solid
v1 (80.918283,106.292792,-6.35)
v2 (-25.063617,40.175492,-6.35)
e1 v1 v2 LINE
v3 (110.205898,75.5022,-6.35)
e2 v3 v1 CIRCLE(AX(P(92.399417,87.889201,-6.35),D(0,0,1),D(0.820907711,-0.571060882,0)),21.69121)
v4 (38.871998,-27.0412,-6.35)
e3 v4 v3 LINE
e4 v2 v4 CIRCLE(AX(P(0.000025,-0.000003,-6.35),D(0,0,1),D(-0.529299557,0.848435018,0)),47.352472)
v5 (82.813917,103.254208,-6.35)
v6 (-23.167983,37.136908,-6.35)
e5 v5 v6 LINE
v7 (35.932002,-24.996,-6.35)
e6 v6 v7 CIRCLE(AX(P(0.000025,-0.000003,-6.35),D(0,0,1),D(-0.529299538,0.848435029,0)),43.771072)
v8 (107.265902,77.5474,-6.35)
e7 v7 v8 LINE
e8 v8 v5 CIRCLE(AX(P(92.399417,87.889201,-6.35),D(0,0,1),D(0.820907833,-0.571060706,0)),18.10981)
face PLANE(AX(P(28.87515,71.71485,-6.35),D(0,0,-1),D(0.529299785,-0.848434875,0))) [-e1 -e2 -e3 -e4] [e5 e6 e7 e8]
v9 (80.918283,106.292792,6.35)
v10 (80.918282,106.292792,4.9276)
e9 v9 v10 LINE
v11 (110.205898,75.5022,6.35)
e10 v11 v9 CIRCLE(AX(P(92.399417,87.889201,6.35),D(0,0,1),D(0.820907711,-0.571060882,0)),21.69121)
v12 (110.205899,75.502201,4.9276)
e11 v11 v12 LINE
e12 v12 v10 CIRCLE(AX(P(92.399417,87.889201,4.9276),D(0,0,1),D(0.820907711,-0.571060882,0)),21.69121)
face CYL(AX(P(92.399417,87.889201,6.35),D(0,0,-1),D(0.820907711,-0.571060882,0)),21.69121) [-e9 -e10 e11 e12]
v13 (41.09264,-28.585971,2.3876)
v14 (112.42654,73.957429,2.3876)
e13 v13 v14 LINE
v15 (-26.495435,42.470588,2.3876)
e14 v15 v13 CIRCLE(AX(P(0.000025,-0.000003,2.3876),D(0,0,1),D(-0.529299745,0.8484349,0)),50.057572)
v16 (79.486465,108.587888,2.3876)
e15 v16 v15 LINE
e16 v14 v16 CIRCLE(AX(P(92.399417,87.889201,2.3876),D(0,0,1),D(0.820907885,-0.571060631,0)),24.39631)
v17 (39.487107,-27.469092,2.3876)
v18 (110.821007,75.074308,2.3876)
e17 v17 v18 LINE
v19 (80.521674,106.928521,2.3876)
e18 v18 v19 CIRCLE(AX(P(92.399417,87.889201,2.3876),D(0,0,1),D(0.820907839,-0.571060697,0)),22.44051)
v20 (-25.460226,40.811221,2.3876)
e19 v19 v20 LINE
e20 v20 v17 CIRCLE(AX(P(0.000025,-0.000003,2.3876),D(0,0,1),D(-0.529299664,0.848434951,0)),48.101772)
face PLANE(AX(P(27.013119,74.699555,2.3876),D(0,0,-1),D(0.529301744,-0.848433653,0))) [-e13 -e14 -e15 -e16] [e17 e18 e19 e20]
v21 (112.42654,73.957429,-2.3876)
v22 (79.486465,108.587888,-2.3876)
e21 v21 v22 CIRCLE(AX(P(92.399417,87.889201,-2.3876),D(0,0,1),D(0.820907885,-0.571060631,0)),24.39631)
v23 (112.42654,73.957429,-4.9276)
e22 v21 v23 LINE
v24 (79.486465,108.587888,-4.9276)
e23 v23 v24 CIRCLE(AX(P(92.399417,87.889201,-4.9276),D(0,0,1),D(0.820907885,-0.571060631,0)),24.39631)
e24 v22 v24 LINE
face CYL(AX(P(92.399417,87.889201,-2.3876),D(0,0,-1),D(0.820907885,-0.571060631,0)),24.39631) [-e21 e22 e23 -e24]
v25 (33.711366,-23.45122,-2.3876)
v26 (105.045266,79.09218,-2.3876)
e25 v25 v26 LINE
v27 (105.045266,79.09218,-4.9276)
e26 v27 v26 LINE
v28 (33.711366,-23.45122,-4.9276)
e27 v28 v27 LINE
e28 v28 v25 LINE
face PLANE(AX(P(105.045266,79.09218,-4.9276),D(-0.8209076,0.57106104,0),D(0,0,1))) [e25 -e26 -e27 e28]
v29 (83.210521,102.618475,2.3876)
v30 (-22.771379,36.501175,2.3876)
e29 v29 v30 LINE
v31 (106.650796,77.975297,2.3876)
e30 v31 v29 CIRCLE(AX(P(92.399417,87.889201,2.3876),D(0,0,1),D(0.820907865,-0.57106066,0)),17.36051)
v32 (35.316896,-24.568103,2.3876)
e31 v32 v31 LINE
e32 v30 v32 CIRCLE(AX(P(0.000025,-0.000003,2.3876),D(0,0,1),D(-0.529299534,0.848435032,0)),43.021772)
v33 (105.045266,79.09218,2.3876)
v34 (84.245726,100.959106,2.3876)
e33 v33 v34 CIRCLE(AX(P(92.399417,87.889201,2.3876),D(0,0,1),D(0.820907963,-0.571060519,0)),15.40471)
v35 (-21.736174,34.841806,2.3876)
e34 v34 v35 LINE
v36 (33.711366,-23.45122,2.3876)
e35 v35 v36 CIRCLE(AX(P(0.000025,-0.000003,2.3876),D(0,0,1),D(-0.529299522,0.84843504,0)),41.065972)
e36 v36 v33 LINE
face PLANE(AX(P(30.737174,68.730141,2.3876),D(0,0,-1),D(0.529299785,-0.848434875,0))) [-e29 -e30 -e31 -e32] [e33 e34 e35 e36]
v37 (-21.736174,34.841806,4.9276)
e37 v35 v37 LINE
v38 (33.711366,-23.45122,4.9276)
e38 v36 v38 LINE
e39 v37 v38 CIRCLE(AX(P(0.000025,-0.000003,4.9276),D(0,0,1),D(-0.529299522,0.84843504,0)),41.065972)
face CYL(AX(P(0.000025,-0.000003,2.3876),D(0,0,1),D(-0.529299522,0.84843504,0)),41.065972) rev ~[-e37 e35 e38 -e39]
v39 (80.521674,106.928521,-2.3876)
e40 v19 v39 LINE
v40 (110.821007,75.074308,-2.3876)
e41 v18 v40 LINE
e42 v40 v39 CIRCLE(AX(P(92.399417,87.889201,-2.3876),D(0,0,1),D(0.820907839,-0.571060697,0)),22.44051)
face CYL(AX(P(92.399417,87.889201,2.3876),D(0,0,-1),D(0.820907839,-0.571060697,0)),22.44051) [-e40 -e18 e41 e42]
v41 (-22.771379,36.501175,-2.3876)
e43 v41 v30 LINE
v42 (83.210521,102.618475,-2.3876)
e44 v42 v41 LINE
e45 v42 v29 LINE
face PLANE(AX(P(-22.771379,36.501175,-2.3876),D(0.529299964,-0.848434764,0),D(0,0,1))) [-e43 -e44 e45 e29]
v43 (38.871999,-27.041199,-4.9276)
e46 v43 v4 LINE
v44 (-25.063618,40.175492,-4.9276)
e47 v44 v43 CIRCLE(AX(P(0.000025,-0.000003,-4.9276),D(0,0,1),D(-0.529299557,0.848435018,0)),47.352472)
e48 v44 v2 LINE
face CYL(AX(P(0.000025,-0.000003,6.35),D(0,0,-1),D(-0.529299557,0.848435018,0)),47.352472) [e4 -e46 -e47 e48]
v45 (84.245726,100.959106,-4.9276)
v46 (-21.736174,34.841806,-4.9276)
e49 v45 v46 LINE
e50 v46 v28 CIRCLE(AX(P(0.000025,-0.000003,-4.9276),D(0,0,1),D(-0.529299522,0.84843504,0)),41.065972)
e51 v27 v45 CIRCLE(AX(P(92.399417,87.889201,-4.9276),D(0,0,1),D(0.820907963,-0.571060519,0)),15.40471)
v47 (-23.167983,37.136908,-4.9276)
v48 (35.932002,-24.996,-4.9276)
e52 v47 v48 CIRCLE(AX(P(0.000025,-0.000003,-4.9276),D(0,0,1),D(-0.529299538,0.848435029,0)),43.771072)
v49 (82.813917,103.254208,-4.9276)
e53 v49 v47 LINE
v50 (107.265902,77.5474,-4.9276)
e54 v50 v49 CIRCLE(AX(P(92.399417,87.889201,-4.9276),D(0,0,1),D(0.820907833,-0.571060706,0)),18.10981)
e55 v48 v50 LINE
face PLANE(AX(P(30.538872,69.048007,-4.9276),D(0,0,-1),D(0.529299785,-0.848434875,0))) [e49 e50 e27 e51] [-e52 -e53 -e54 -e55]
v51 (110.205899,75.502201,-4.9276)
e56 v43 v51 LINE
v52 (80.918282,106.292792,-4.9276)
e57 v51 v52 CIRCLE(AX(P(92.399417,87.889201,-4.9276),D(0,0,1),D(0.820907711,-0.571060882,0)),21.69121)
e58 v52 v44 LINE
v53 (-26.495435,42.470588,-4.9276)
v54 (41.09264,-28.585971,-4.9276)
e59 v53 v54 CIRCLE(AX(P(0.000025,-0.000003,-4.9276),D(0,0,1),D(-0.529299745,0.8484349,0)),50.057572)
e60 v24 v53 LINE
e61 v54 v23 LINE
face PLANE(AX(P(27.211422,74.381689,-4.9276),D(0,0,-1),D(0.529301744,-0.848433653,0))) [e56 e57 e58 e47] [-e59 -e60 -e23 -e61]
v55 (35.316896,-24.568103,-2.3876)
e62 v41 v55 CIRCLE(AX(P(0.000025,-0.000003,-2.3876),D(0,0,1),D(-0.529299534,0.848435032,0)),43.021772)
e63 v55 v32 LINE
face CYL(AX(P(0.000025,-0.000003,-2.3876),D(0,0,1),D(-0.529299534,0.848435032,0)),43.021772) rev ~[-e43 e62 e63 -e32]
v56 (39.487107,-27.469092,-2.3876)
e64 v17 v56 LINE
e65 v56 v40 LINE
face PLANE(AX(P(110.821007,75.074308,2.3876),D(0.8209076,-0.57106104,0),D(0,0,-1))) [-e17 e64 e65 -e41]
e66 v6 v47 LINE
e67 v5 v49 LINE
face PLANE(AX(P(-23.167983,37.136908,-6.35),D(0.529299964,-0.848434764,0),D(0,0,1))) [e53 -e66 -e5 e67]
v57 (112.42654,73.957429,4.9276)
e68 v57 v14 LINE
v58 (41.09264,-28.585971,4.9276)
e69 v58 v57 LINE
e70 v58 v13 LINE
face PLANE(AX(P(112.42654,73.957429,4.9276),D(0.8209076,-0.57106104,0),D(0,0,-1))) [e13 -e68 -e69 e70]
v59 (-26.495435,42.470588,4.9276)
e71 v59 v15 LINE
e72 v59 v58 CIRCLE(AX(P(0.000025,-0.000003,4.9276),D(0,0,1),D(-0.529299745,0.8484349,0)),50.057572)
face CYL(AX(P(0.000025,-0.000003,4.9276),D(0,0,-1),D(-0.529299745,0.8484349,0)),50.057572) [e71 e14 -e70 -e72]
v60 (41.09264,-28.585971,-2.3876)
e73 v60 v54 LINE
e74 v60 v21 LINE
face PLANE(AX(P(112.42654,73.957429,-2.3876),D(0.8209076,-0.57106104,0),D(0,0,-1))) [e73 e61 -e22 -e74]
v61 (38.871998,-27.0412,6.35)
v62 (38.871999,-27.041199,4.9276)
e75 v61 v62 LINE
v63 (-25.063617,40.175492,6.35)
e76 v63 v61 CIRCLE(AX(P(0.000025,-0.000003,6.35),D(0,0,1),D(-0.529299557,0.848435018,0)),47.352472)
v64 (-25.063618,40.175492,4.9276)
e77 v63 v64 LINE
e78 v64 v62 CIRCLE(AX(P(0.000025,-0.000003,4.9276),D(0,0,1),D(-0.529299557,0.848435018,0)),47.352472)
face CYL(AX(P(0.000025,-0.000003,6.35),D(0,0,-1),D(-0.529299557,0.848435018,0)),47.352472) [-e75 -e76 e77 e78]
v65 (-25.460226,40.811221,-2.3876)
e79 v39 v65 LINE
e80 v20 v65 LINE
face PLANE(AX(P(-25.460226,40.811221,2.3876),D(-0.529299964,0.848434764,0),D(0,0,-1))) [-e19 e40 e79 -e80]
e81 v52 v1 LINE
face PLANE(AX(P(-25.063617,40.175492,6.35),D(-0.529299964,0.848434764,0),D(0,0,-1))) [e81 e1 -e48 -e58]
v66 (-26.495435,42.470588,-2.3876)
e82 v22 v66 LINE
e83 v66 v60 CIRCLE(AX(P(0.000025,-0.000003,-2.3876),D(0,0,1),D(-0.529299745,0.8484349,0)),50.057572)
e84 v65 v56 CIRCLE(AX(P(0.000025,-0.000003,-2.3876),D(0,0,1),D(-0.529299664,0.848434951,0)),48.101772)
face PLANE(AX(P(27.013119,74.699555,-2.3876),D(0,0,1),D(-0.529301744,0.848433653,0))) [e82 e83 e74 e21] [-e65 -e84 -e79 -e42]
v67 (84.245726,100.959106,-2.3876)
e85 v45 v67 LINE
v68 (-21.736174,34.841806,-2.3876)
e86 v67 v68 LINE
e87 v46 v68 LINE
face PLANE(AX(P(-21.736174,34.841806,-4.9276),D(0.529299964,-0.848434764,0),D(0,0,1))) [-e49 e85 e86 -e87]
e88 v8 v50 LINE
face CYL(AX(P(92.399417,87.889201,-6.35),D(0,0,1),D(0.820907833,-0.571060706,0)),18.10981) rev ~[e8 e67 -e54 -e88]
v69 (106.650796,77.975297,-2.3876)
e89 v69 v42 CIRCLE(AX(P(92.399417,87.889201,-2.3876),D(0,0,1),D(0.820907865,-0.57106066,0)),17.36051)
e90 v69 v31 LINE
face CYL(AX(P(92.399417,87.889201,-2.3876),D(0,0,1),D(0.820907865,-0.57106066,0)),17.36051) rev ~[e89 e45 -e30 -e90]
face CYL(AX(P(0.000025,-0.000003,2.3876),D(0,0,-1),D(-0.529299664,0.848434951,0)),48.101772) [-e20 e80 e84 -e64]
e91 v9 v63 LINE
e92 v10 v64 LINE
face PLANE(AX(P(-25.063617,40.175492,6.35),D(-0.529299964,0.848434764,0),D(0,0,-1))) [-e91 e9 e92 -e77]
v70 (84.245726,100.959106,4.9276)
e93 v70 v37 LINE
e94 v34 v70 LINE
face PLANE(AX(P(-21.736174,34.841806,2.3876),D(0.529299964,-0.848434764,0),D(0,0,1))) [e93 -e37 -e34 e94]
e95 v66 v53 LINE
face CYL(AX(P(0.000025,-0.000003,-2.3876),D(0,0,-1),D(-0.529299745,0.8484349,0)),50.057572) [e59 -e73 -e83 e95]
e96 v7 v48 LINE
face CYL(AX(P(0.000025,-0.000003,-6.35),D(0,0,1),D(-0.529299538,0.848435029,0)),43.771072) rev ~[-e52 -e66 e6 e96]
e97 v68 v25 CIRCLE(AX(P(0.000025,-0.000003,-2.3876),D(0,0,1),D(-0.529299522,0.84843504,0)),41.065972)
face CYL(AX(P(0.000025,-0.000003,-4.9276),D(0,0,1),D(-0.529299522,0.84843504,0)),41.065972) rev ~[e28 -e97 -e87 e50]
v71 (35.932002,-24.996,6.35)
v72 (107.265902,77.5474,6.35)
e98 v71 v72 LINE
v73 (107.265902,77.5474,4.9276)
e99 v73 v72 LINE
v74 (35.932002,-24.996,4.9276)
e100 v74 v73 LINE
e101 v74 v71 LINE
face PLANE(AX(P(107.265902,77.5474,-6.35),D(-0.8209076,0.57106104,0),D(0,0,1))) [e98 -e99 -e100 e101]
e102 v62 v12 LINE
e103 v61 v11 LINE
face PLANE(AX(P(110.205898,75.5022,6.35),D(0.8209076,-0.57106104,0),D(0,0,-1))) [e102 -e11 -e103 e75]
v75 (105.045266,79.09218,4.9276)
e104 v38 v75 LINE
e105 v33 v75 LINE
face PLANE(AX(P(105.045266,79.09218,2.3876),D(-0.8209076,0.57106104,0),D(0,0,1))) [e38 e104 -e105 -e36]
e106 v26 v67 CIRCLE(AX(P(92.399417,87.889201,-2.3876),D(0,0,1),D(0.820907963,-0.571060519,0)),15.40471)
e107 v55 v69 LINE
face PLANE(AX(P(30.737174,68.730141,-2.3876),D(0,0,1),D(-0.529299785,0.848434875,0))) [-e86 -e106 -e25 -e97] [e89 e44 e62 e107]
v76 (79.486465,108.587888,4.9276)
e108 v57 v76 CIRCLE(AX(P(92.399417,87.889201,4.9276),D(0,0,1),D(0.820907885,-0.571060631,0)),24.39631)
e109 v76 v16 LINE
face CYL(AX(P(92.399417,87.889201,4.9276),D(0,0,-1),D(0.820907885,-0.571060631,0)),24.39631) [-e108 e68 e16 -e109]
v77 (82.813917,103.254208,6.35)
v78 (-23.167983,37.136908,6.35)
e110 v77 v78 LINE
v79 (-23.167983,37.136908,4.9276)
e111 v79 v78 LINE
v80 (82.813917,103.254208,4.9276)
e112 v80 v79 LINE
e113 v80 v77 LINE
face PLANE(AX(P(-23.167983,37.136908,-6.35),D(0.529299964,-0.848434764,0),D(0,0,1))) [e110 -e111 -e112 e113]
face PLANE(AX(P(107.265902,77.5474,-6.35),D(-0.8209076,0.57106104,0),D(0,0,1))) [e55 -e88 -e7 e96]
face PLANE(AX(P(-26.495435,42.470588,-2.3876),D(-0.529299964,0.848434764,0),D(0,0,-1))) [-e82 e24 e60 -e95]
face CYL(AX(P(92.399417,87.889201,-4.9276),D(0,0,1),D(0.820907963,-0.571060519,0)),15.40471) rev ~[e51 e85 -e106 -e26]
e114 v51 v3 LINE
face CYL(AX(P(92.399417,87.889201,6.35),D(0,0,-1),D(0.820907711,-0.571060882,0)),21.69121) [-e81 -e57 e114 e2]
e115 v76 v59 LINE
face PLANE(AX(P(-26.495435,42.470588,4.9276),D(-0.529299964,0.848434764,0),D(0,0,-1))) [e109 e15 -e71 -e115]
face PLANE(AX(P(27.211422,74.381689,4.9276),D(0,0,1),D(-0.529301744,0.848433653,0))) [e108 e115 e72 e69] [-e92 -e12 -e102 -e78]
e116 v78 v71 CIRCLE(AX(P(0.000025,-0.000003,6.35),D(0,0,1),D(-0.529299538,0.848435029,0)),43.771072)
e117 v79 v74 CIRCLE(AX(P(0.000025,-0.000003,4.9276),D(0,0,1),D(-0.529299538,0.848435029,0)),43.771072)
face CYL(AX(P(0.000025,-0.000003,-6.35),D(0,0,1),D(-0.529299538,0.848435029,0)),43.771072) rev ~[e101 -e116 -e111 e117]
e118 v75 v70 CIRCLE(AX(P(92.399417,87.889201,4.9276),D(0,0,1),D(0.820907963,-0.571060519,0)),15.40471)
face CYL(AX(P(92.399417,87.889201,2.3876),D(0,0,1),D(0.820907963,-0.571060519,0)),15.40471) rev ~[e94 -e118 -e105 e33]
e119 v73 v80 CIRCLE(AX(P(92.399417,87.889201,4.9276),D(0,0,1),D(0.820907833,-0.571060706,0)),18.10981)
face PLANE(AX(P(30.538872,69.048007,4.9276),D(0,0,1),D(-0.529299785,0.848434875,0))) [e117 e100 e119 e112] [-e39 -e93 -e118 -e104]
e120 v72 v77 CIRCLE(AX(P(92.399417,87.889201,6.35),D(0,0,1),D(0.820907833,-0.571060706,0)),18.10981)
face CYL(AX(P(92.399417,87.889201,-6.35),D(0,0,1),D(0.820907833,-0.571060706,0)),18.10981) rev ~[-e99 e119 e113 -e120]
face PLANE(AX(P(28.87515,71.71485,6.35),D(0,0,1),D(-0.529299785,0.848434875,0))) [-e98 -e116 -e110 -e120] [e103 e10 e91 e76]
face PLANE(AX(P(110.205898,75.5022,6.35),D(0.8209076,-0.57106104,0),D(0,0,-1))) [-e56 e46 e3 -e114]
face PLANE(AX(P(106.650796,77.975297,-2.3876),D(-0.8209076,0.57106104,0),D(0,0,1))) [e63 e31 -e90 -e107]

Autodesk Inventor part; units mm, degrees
ref_plane "Work Plane2" through (92.3994, 87.8892, 0) normal (-1, 0, 0) x (0, 0, 1)
ref_plane "Work Plane3" through (0, 0, 0) normal (0.6338453, 0.7734598, 0) x (0, 0, 1)
sketch "Path" plane through (0, 0, 0) normal (0, 0, 1) x (1, 0, 0)
  arc A0 (108.7359, 76.5248) -> (81.8661, 104.7735) centre (92.3994, 87.8892) ccw
  arc A1 (-24.1158, 38.6562) -> (37.402, -26.0186) centre (0, 0) ccw
  line L0 (-24.1158, 38.6562) -> (81.8661, 104.7735)
  line L1 (108.7359, 76.5248) -> (37.402, -26.0186)
  dimension "d31" = 8.9916
ref_plane "Section Plane" through (81.8661, 104.7735, 0) normal (-0.8484349, -0.5292998, 0) x (0, 0, 1)
sketch "Section Sketch" plane through (81.8661, 104.7735, 0) normal (-0.8484349, -0.5292998, 0) x (0, 0, 1)
  line L0 (-6.35, -1.7907) -> (6.35, -1.7907)
  line L1 (6.35, -1.7907) -> (6.35, 1.7907)
  line L2 (6.35, 1.7907) -> (-6.35, 1.7907)
  line L3 (-6.35, 1.7907) -> (-6.35, -1.7907)
  line L4 (-2.3876, -2.54) -> (2.3876, -2.54)
  line L5 (2.3876, -2.54) -> (2.3876, 2.54)
  line L6 (2.3876, 2.54) -> (-2.3876, 2.54)
  line L7 (-2.3876, 2.54) -> (-2.3876, -2.54)
  line L8 (-2.3876, 0) -> (2.3876, 0) construction
  line L9 (-4.9276, -4.4958) -> (-2.3876, -4.4958)
  line L10 (-2.3876, -4.4958) -> (-2.3876, 4.4958)
  line L11 (-2.3876, 4.4958) -> (-4.9276, 4.4958)
  line L12 (-4.9276, 4.4958) -> (-4.9276, -4.4958)
  line L13 (2.3876, -4.4958) -> (4.9276, -4.4958)
  line L14 (4.9276, -4.4958) -> (4.9276, 4.4958)
  line L15 (4.9276, 4.4958) -> (2.3876, 4.4958)
  line L16 (2.3876, 4.4958) -> (2.3876, -4.4958)
  line L17 (-6.35, 0) -> (6.35, 0) construction
  point P0 (0, 0)
  point P1 (0, 0)
  dimension "d21" = 3.5814
  dimension "d22" = 5.08
  dimension "d23" = 4.7752
  dimension "d24" = 2.54
  dimension "d31" = 8.9916
  dimension "d32" = 12.7
sweep "Solid" add profiles "Section Sketch" path "Path"
pattern_of_one "Strand Pattern"
equation "\"d21\" = da_d2"
equation "\"d22\" = da_d1"
equation "\"d23\" = da_b1"
equation "\"d24\" = da_t1 + da_t2"
equation "\"d30\" = da_pt"
equation "\"da_p\" = 9.525"
equation "\"da_b1\" = 4.7752"
equation "\"da_h2\" = 8.9916"
equation "\"da_h3\" = 7.7978"
equation "\"da_d1\" = 5.08"
equation "\"da_d2\" = 3.5814"
equation "\"da_pt\" = 10.1346"
equation "\"da_b\" = 12.7"
equation "\"da_t1\" = 1.27"
equation "\"da_t2\" = 1.27"
properties part number "Roller Chain"
